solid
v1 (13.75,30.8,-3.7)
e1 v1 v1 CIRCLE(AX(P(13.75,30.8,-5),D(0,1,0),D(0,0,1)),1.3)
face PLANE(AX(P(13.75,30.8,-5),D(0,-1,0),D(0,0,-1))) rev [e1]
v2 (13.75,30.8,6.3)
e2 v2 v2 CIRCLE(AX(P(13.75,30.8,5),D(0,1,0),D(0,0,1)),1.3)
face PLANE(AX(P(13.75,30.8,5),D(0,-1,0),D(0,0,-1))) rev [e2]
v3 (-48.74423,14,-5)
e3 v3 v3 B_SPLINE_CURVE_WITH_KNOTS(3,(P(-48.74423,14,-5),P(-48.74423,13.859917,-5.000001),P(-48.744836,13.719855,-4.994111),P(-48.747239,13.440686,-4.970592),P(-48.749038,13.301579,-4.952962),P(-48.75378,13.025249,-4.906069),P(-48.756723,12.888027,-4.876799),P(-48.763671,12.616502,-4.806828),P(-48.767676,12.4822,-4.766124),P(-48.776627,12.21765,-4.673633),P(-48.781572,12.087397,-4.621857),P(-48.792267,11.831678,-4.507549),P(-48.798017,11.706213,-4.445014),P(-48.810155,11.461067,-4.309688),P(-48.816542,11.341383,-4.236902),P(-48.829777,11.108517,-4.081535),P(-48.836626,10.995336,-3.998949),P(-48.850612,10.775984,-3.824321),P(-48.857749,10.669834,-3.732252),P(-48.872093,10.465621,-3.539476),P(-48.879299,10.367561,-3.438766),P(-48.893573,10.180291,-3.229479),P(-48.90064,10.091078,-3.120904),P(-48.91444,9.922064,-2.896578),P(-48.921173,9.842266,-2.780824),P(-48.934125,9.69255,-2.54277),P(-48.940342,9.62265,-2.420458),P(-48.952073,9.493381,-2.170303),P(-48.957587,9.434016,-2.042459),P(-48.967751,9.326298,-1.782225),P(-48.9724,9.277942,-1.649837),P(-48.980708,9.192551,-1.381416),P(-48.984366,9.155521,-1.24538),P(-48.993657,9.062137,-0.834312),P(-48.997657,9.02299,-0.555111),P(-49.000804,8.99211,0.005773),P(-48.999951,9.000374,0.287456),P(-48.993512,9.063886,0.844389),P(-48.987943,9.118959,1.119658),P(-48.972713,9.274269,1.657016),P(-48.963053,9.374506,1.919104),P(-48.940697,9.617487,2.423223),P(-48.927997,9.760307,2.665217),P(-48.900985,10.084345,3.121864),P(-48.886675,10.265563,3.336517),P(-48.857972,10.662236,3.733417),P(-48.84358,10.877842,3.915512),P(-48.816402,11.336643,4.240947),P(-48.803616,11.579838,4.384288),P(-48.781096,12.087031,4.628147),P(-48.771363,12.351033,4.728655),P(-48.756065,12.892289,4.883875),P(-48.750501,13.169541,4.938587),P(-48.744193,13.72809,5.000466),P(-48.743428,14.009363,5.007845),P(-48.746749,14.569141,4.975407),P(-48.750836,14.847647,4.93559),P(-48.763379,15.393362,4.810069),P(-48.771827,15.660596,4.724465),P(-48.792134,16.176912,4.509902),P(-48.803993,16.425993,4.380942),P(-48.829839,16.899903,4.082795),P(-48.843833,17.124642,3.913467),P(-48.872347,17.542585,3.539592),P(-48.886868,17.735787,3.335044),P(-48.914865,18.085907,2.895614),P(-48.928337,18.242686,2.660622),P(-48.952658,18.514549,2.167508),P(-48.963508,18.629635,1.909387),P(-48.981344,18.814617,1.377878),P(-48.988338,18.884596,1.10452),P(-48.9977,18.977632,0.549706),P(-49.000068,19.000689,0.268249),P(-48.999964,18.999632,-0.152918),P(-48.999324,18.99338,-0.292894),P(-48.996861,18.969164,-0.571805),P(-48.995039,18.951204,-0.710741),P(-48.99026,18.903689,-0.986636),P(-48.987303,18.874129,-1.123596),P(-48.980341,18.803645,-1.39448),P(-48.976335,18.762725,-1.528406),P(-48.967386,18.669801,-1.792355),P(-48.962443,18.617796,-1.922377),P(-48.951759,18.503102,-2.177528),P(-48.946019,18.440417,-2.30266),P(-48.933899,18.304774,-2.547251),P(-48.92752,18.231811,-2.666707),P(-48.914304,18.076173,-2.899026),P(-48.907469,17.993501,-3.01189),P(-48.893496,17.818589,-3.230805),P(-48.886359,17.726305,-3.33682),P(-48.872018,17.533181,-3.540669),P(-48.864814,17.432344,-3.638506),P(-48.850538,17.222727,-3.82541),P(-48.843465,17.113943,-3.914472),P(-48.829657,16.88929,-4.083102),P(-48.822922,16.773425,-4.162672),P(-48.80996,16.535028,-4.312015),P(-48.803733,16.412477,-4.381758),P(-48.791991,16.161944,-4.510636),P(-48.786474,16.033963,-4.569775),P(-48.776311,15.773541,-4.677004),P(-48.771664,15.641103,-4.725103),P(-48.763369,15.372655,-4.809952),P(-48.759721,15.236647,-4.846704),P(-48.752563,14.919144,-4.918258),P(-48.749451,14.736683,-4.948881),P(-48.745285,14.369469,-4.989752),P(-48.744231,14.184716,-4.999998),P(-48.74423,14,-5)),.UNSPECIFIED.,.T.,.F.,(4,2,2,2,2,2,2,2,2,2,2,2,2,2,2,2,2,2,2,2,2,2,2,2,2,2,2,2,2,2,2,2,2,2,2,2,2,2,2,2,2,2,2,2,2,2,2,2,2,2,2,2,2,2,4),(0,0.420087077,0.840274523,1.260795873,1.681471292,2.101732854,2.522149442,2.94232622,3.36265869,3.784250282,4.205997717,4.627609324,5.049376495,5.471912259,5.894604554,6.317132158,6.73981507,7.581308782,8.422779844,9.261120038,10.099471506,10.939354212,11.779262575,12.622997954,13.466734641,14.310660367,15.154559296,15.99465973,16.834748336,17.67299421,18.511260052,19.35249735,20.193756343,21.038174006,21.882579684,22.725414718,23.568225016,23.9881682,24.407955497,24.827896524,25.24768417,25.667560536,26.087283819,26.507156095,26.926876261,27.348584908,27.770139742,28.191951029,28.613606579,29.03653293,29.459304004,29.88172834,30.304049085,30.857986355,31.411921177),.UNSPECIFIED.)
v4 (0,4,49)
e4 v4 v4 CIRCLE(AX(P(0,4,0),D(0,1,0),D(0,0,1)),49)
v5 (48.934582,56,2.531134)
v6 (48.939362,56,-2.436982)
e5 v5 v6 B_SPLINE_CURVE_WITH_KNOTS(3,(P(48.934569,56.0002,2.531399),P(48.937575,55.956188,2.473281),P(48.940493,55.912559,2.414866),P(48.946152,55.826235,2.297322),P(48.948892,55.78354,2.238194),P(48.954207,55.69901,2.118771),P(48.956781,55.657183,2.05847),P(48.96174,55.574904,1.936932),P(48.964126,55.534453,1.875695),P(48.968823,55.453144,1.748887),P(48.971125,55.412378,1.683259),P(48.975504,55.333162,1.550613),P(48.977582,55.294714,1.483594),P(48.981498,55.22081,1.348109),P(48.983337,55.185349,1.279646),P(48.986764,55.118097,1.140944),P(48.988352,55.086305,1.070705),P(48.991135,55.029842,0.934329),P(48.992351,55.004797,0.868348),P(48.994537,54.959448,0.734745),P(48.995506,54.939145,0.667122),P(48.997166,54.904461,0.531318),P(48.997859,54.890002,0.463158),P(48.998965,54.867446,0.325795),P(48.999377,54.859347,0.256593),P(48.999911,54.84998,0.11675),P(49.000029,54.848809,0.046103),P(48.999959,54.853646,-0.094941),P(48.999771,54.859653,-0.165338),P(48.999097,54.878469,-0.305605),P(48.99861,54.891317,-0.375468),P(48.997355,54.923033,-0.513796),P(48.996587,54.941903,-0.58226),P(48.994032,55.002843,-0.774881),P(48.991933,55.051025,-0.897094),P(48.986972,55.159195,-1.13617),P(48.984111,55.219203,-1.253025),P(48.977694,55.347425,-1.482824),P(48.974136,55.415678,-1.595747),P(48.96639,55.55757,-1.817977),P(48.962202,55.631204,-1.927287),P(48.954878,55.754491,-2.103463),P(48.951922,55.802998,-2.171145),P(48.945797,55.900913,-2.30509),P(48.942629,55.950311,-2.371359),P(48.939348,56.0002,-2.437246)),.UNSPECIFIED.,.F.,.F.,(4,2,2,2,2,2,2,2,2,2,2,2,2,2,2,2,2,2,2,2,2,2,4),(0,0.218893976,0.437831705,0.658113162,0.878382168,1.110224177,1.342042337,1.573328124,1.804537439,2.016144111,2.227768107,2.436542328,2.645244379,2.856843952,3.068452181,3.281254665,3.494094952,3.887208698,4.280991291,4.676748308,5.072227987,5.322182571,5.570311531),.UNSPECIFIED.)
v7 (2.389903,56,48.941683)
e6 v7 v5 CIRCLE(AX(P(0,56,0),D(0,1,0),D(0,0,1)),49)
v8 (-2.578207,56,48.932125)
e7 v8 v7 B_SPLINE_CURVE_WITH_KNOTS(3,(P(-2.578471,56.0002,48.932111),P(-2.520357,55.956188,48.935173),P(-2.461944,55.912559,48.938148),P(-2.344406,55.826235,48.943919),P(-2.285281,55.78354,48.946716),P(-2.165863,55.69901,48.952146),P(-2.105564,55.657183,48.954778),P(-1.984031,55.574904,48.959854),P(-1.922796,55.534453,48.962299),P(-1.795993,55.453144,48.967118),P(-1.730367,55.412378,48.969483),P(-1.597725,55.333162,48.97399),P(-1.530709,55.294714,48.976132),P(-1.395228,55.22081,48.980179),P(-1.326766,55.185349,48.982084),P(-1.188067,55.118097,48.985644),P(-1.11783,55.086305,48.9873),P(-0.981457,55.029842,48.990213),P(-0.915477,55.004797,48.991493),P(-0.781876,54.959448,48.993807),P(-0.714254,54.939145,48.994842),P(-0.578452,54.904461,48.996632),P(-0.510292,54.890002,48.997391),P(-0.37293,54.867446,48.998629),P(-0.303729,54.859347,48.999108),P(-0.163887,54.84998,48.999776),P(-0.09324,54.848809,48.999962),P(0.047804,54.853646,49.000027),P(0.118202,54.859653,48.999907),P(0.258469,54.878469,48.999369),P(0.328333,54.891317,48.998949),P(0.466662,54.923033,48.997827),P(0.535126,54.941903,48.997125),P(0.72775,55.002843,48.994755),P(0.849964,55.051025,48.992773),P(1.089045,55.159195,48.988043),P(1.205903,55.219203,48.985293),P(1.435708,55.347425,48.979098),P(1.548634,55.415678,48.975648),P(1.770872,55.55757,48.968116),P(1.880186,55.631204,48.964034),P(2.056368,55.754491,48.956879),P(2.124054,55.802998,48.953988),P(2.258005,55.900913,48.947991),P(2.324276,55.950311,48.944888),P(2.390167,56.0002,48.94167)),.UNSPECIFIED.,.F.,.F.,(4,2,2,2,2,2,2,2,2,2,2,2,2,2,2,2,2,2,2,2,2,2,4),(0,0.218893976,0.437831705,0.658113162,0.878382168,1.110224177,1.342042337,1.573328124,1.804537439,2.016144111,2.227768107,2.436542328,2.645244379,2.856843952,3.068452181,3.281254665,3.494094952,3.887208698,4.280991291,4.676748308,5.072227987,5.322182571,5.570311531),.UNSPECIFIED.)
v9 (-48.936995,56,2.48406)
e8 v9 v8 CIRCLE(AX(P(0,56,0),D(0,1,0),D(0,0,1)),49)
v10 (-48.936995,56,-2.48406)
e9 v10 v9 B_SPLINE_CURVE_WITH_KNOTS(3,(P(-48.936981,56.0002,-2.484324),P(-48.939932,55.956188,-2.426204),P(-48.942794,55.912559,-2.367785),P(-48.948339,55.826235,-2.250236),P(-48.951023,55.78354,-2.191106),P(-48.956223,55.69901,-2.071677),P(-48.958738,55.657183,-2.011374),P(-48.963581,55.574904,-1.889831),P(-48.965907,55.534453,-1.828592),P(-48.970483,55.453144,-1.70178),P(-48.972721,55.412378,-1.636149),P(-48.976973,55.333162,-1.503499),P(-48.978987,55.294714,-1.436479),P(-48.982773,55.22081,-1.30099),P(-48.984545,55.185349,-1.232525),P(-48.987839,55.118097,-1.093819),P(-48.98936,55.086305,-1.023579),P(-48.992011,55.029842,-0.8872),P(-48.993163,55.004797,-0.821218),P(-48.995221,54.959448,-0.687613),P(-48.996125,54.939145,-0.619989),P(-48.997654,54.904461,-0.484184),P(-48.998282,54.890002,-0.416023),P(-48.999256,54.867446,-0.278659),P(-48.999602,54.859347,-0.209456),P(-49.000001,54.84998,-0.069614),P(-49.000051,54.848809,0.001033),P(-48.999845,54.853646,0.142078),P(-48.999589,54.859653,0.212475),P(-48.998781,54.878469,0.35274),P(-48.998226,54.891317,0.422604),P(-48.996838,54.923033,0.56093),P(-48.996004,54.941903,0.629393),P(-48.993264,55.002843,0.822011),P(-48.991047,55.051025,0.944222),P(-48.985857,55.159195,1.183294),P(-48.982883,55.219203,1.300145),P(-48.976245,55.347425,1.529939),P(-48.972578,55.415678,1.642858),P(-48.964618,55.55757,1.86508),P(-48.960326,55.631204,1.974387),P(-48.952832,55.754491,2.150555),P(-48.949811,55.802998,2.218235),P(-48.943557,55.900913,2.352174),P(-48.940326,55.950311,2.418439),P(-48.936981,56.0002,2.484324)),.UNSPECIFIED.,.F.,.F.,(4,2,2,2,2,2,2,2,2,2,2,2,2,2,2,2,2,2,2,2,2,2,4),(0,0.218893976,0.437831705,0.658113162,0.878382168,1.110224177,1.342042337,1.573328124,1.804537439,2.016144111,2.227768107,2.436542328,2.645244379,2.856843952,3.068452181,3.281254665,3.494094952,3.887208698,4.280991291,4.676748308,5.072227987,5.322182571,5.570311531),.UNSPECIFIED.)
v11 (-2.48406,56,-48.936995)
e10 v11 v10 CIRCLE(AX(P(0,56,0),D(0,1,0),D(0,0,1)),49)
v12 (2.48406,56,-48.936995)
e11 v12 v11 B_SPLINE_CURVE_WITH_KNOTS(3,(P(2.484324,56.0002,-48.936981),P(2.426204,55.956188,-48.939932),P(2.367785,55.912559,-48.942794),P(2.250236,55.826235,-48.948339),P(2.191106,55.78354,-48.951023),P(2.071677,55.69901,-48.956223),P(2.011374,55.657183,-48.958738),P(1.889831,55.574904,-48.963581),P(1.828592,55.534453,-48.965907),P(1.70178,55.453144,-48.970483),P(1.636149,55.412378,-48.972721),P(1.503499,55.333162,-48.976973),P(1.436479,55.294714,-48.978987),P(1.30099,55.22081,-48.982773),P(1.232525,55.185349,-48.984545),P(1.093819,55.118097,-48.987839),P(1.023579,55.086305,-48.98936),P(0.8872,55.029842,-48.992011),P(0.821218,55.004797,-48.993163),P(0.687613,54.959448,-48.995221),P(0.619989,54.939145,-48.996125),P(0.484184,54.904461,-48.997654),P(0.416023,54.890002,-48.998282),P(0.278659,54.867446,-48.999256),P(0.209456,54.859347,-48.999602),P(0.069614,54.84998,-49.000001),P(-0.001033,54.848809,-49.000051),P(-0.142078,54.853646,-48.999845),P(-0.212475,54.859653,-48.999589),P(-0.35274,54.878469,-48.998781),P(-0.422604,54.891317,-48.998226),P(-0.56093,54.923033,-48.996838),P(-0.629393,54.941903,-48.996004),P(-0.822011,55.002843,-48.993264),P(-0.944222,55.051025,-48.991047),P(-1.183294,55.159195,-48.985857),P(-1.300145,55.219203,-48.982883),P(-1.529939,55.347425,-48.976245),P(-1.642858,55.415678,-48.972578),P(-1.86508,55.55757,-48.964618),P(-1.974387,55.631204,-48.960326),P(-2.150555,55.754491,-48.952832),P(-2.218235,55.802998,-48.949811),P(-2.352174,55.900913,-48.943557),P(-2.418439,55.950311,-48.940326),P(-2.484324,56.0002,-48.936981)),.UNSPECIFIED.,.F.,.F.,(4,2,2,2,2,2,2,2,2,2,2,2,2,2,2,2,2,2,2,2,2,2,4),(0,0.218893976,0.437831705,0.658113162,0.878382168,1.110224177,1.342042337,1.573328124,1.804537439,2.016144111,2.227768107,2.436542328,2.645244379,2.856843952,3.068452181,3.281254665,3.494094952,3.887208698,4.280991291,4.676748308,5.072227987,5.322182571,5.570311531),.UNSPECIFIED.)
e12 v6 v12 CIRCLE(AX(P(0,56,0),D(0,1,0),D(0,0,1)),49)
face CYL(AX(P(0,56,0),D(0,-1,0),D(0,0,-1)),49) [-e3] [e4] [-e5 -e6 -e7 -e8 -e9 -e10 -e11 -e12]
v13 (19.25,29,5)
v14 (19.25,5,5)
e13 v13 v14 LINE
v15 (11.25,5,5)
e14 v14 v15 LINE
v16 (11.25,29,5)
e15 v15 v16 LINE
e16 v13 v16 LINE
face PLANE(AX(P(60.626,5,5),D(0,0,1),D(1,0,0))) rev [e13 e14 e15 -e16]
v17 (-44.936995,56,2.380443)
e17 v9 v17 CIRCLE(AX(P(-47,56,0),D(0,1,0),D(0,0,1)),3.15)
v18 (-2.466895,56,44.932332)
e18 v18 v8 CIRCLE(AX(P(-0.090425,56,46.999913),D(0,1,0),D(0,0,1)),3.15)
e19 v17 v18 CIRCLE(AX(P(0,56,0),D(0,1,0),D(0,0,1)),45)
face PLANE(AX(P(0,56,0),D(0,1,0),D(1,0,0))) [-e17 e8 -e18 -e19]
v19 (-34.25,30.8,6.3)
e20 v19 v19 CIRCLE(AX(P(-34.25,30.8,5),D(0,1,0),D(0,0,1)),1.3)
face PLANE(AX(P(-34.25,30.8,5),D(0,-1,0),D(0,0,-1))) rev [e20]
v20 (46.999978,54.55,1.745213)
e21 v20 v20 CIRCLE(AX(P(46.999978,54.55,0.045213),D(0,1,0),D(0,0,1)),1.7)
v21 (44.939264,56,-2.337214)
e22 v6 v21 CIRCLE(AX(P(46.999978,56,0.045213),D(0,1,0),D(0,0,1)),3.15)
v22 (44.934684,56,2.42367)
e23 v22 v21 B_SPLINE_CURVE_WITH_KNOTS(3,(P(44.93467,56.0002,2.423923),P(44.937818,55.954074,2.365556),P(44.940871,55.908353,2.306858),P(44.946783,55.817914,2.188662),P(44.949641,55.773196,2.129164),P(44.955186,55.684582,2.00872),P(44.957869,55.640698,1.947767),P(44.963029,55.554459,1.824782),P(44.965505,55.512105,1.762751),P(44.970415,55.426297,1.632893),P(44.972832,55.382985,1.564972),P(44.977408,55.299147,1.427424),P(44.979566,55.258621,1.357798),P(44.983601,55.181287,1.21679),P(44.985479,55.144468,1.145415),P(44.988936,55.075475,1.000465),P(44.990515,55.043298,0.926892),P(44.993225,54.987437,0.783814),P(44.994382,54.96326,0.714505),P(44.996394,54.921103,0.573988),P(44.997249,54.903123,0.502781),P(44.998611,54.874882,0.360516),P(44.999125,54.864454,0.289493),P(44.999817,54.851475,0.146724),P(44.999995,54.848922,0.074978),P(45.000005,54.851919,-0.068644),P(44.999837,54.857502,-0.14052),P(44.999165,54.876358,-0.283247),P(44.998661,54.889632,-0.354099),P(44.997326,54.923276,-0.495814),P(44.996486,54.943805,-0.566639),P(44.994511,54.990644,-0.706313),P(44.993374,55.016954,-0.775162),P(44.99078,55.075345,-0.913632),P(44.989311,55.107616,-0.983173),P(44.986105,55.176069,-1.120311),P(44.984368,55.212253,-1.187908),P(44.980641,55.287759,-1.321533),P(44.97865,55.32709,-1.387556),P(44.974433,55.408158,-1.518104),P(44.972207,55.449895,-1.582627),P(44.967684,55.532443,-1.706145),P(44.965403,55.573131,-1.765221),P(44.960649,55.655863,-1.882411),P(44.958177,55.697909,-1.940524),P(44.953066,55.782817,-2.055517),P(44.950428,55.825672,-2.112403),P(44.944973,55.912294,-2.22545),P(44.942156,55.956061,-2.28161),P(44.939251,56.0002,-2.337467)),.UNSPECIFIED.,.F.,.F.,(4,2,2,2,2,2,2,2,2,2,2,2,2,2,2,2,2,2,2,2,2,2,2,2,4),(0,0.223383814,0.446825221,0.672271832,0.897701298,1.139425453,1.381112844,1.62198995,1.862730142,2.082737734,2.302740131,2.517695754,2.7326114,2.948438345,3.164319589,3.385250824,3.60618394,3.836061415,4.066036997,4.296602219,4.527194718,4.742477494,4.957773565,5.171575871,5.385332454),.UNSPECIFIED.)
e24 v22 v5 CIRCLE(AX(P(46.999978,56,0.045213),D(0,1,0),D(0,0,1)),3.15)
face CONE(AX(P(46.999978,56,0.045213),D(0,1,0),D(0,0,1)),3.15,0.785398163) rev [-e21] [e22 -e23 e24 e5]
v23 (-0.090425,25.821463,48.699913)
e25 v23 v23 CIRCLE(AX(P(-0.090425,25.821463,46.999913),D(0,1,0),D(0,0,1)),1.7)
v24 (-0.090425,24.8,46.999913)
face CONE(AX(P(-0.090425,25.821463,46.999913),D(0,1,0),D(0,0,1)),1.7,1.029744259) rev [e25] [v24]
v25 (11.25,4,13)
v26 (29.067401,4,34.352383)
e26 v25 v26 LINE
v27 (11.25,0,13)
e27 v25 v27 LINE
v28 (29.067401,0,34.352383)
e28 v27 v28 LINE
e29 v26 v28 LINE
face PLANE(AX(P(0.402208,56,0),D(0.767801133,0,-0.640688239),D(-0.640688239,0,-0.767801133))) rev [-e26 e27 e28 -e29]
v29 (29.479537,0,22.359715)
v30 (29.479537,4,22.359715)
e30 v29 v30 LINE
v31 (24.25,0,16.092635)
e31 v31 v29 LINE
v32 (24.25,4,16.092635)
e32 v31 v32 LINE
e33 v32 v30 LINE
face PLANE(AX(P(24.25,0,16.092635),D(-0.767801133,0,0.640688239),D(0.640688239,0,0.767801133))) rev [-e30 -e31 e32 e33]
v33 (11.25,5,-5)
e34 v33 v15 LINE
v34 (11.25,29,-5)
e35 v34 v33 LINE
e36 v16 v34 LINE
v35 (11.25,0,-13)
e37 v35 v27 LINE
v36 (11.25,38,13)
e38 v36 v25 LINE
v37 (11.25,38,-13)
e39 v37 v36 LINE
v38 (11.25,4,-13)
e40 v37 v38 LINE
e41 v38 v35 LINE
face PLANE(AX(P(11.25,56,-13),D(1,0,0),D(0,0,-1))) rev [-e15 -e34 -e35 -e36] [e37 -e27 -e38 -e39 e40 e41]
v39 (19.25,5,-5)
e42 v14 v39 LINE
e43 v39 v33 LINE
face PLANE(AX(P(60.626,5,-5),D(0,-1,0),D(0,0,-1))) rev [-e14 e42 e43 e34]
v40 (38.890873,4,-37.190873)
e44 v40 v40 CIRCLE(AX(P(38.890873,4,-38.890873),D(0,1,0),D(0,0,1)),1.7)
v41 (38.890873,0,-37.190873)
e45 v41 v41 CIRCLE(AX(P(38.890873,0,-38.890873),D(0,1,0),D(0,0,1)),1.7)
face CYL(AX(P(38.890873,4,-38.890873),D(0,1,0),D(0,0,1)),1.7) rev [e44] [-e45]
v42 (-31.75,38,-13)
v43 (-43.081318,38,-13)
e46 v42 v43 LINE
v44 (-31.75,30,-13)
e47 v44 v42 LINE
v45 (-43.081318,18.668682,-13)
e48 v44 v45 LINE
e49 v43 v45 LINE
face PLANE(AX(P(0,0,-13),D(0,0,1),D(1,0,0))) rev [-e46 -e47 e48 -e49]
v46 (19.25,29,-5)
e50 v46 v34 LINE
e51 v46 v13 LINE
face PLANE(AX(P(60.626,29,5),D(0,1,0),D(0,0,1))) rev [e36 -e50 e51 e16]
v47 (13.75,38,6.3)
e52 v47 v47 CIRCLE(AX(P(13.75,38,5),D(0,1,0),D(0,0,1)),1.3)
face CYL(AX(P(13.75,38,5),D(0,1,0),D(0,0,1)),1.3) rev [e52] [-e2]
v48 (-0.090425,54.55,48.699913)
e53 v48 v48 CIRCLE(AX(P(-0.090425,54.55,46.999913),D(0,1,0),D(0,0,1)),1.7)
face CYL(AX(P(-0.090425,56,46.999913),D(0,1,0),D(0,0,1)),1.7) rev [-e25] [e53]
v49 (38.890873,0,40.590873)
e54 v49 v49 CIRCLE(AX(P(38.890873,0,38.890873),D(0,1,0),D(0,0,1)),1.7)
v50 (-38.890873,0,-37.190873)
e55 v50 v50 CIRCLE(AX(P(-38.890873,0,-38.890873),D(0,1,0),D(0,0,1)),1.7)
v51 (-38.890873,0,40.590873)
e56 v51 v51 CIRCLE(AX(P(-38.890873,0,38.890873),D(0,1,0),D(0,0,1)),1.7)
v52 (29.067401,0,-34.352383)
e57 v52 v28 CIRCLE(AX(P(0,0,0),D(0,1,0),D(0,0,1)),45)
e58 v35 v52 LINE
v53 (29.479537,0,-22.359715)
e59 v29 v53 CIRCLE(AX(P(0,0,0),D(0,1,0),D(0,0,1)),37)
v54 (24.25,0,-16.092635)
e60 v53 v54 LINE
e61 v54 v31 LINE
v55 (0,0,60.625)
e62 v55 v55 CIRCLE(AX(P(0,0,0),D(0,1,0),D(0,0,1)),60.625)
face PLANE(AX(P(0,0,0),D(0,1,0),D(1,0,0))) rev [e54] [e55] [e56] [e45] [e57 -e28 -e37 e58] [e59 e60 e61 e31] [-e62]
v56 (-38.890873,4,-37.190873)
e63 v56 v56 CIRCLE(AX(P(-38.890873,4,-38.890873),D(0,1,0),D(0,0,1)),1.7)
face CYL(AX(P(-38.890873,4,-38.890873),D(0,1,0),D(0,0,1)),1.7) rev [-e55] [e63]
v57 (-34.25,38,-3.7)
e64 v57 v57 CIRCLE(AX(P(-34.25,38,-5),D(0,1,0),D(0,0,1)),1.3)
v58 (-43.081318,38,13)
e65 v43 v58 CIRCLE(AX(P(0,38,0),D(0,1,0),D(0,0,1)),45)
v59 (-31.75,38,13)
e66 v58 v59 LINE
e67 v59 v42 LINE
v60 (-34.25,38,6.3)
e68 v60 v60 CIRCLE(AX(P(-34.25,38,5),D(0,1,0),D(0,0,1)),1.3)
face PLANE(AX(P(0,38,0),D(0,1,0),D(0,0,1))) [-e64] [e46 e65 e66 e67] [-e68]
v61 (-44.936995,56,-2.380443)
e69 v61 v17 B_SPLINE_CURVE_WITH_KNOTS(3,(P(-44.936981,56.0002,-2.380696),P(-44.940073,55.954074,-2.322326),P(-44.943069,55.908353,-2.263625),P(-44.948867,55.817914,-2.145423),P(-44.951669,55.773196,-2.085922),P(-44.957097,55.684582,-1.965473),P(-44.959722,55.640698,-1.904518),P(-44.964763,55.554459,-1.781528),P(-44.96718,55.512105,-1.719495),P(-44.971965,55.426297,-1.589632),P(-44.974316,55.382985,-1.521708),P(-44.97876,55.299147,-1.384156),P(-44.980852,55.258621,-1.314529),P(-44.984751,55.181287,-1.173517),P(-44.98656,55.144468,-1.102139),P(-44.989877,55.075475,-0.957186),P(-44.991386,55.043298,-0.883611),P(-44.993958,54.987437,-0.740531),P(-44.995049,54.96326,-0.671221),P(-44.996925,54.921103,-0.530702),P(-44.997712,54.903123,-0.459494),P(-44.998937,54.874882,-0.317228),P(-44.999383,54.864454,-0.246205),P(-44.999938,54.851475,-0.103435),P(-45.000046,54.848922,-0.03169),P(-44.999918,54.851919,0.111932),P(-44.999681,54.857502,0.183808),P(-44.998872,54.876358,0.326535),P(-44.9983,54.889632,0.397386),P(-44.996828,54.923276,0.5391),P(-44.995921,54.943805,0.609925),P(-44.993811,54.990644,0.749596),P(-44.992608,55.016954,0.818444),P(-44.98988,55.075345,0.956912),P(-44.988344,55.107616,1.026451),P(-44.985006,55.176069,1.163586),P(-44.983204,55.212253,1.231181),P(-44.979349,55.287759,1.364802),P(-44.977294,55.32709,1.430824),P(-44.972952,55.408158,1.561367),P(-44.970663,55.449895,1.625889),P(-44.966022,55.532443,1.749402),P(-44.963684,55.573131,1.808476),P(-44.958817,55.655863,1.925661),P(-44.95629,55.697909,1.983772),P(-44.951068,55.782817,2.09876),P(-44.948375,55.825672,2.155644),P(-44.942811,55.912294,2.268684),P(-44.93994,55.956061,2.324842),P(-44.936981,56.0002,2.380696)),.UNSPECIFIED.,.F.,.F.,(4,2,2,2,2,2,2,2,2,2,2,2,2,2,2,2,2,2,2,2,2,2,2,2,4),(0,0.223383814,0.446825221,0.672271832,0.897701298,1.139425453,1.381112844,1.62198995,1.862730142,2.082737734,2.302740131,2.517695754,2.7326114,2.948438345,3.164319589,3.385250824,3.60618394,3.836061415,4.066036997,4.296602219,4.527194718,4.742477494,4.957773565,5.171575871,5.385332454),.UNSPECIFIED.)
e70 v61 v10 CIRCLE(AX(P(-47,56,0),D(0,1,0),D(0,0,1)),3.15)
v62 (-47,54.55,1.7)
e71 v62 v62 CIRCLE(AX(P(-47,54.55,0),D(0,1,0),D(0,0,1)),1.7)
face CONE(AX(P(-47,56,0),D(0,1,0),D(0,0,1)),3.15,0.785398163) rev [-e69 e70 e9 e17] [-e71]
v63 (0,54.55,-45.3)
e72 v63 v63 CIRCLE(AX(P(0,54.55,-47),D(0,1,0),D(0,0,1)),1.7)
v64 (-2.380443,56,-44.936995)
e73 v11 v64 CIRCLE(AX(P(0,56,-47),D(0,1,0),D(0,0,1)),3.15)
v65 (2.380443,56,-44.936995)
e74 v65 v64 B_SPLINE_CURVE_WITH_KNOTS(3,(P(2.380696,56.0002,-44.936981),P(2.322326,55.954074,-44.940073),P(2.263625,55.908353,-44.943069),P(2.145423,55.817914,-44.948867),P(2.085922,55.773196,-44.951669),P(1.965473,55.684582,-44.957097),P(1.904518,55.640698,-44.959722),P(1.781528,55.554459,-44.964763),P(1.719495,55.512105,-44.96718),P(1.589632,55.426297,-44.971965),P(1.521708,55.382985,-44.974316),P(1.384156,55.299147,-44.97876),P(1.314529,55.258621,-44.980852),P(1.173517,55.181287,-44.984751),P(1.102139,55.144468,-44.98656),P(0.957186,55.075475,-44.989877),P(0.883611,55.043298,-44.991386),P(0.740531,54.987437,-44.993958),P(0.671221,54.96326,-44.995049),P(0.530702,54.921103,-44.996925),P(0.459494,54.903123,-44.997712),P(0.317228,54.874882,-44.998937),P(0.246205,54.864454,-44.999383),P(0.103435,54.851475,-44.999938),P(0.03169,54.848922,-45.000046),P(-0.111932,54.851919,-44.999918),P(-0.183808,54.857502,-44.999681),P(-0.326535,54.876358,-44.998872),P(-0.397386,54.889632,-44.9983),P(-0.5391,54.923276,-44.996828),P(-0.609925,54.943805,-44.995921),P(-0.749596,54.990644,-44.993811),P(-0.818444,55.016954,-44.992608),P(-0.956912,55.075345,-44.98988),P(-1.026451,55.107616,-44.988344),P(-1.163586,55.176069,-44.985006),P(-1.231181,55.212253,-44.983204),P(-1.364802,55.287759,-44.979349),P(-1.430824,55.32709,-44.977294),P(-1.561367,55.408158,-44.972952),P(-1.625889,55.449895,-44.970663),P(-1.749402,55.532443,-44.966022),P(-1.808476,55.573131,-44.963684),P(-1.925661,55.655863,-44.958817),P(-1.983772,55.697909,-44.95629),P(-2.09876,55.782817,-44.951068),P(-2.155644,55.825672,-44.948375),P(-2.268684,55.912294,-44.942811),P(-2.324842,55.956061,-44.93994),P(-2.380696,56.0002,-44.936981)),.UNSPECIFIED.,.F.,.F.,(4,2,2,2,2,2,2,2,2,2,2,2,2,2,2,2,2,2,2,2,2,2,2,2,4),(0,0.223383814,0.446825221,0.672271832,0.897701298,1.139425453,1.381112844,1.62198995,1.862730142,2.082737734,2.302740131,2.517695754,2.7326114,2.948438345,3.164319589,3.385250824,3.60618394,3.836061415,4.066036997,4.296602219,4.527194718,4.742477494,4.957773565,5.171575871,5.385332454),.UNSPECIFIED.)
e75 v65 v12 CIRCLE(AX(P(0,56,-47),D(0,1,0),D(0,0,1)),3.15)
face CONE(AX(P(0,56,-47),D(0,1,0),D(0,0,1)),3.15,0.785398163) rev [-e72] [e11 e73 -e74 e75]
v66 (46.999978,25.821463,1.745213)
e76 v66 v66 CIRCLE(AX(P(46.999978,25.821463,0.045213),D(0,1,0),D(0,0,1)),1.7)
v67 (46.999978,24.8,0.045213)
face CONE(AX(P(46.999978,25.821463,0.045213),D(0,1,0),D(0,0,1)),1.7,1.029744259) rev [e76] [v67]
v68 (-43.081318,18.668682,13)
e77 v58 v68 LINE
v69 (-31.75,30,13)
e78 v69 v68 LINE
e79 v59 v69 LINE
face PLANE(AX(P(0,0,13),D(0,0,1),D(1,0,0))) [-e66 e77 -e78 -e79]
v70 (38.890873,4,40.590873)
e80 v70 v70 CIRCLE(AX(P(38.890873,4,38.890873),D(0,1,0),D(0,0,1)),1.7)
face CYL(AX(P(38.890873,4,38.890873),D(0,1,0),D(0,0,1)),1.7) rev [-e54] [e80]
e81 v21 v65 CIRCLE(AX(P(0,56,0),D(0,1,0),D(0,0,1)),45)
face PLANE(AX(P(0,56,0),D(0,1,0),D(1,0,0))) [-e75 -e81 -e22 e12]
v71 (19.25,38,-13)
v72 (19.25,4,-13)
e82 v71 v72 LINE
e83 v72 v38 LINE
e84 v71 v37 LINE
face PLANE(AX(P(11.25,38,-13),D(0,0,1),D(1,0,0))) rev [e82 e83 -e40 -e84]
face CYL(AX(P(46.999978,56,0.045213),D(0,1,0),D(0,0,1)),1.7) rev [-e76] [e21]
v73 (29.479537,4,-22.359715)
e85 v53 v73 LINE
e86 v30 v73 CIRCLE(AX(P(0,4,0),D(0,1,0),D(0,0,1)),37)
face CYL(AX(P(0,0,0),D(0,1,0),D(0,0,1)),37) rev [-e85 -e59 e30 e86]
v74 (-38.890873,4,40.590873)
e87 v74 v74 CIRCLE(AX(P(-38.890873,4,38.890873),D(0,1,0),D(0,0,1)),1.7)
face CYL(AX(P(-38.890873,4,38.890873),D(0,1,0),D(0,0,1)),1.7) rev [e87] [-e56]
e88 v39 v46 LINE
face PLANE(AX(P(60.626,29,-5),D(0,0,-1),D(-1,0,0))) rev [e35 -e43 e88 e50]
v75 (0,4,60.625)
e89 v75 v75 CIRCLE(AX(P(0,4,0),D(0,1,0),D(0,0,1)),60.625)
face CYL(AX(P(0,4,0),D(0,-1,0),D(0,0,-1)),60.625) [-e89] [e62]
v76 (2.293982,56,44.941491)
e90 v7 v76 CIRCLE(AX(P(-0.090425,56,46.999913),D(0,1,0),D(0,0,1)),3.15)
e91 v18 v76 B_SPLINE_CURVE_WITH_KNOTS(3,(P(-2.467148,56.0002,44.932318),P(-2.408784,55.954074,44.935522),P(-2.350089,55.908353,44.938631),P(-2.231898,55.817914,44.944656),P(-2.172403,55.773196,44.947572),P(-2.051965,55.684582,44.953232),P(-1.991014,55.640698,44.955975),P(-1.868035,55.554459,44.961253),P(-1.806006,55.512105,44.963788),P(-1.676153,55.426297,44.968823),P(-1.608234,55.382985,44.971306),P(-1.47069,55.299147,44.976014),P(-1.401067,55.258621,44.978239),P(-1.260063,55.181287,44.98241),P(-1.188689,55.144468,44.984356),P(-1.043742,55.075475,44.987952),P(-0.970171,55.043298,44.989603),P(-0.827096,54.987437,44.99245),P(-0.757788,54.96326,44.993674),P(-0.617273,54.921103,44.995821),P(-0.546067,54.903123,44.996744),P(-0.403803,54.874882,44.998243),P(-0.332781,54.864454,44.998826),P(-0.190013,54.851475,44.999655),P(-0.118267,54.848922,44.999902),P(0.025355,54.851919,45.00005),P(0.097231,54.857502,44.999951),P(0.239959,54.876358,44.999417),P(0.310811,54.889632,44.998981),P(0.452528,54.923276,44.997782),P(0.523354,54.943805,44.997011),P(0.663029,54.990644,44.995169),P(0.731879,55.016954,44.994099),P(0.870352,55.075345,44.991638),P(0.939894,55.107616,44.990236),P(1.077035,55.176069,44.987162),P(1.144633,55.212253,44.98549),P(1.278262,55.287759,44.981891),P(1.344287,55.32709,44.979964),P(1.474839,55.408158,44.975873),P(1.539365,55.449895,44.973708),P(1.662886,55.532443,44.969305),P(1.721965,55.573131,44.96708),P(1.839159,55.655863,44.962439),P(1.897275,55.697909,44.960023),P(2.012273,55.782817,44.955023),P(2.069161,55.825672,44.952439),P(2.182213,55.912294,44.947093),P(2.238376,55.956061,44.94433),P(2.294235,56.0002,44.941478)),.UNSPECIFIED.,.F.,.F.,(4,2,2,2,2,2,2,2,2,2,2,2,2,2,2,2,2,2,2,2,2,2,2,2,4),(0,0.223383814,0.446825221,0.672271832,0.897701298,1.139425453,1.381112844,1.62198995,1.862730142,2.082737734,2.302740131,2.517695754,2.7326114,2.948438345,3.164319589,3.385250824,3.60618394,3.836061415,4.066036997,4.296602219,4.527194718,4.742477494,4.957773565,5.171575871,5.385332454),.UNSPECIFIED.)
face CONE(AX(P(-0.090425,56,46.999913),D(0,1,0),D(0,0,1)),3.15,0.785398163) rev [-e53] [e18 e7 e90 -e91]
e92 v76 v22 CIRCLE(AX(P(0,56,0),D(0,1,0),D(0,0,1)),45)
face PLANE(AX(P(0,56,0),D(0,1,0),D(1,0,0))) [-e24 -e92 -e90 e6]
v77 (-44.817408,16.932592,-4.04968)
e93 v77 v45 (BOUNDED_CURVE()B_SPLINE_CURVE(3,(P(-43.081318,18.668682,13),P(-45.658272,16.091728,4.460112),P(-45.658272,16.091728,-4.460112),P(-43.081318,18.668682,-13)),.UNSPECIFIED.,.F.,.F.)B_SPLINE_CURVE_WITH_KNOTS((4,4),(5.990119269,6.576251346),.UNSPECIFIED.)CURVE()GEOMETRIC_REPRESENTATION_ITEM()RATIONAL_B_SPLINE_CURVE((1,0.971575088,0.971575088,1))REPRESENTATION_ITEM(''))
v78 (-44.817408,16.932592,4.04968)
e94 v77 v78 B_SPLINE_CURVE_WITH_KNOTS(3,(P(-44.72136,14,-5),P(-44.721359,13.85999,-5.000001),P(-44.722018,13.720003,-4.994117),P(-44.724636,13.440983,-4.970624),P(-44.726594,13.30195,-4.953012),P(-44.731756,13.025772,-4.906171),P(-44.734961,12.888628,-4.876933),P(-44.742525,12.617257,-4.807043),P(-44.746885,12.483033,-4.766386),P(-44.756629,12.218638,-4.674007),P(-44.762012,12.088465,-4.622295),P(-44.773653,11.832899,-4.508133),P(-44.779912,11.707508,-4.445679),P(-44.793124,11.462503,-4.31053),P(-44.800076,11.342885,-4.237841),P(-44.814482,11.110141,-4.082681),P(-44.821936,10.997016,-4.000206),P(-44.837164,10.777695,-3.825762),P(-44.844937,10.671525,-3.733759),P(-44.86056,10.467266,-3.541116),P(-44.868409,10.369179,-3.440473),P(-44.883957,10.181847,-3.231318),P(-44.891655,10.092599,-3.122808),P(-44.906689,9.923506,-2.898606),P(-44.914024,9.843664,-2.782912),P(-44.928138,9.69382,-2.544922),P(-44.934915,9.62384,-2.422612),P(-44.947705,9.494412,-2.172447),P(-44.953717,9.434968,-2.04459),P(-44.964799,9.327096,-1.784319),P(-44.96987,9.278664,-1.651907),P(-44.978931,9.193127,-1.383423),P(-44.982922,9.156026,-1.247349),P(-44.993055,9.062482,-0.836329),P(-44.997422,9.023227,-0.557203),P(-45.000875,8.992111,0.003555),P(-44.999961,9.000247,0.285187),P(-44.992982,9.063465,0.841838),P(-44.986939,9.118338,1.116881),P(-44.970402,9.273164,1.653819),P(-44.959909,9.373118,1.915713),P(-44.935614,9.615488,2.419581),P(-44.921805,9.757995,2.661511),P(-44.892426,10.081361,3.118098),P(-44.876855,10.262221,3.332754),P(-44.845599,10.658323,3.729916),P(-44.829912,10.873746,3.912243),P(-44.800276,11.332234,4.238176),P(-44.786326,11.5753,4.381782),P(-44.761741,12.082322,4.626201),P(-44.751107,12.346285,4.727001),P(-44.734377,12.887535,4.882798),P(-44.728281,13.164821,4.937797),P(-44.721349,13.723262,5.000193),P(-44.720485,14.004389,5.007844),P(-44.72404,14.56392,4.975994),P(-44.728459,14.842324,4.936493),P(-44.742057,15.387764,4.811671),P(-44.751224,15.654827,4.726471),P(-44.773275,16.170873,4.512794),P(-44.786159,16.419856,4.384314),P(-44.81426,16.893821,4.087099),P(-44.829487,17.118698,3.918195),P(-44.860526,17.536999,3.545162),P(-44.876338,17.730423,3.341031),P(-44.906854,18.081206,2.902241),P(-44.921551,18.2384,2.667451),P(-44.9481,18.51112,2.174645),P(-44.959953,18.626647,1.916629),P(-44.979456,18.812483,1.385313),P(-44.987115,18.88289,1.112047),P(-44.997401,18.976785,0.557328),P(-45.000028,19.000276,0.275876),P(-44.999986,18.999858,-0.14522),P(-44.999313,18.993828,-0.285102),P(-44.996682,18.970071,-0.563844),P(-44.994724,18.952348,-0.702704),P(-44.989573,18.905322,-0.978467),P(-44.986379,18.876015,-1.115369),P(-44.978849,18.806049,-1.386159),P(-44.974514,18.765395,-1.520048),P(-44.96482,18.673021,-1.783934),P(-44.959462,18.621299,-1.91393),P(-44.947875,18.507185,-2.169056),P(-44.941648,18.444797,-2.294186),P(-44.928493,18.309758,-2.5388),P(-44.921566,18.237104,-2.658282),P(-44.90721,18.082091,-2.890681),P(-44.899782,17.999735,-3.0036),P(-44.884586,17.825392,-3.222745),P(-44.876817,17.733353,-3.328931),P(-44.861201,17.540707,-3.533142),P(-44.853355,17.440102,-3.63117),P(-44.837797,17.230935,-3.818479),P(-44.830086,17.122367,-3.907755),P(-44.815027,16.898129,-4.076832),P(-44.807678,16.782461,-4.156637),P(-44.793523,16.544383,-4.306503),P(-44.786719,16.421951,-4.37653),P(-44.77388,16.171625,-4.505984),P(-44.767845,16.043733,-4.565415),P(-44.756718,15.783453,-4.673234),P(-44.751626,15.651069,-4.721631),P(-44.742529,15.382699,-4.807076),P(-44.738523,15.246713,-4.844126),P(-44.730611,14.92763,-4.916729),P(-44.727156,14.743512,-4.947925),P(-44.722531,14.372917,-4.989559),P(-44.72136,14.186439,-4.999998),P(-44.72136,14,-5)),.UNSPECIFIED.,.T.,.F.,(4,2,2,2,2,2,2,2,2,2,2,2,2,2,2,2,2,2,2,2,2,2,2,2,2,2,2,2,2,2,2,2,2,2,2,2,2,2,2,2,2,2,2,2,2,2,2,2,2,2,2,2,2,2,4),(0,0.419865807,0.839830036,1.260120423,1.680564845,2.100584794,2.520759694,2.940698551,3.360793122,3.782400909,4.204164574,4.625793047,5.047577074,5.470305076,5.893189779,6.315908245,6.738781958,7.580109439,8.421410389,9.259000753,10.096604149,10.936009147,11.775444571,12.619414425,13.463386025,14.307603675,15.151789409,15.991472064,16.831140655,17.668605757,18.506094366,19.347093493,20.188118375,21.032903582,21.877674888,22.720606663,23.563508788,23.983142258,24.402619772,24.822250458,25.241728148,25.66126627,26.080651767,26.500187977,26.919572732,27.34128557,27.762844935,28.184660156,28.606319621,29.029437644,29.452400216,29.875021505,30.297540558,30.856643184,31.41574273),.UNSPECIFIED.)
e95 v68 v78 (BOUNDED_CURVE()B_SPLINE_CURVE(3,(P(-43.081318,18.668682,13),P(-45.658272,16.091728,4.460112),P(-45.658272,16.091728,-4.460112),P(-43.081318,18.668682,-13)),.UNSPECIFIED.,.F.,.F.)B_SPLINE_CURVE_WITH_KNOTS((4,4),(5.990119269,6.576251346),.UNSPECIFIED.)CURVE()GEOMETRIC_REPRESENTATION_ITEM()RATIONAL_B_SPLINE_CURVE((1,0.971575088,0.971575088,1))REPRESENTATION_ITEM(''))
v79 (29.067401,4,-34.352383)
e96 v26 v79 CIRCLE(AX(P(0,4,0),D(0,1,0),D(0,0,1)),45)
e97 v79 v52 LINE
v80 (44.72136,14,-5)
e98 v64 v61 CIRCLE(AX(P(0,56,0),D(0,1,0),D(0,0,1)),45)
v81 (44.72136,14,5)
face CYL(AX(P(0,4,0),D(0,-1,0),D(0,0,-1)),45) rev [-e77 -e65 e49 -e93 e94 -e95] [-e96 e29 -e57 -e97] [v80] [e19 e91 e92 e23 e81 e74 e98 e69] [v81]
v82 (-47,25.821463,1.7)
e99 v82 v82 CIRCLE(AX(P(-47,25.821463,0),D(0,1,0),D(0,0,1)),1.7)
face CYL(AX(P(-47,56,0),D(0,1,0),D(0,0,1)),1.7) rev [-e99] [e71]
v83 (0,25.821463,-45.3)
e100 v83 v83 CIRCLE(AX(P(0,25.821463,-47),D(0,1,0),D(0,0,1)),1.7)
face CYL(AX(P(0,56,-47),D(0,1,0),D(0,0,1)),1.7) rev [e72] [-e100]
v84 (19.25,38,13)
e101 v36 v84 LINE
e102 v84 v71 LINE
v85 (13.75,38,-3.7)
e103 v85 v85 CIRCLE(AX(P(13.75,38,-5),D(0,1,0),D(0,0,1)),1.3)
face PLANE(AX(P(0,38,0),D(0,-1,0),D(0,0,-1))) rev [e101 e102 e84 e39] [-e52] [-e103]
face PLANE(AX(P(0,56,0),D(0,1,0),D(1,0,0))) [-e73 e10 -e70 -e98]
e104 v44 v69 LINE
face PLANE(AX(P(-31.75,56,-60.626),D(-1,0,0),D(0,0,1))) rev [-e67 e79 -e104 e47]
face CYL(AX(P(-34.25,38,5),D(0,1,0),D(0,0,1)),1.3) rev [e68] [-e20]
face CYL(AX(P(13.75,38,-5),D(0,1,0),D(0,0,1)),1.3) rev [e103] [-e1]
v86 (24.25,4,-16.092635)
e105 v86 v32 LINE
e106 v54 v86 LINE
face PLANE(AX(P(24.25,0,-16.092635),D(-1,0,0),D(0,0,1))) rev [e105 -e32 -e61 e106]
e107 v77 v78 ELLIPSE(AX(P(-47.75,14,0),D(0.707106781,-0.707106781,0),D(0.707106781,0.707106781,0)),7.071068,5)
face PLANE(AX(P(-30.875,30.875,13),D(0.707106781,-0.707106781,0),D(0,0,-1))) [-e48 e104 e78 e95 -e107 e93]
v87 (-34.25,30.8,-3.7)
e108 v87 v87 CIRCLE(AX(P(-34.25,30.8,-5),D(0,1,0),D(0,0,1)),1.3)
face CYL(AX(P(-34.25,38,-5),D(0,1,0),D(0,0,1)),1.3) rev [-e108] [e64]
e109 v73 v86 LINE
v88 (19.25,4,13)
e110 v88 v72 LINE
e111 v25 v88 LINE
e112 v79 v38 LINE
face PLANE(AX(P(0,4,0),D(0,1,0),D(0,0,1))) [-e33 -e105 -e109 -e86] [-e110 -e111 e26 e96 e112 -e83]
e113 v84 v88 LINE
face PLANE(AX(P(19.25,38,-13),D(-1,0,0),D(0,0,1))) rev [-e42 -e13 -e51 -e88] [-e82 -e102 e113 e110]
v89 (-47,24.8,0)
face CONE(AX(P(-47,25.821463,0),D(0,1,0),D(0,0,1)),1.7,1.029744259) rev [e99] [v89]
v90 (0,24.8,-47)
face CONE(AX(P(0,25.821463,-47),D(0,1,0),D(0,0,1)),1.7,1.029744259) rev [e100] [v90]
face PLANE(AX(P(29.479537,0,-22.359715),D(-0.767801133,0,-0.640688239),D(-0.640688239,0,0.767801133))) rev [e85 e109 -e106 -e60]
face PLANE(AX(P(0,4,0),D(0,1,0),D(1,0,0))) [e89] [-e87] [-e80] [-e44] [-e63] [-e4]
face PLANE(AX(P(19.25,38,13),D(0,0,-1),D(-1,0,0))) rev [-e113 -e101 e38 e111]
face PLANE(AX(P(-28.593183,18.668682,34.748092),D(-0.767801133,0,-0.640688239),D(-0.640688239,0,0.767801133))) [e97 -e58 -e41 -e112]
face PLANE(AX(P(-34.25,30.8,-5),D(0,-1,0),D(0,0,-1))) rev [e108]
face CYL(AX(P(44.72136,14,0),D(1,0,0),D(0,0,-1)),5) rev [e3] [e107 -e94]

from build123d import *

# Parameters (mm, degrees)
BOSS_EXTRUDE1_START                             = -18.668682
BOSS_EXTRUDE1_OUTLINE_R                         = 49
BOSS_EXTRUDE1_DEPTH                             = 18.668682
BOSS_EXTRUDE1_START_2                           = -56
BOSS_EXTRUDE1_2_OUTLINE_R                       = 49
BOSS_EXTRUDE1_2_OUTLINE_R_2                     = 45
BOSS_EXTRUDE1_2_DEPTH                           = 37.331318
BOSS_EXTRUDE1_START_3                           = -4
BOSS_EXTRUDE1_3_OUTLINE_R                       = 60.625
BOSS_EXTRUDE1_3_OUTLINE_R_2                     = 49
BOSS_EXTRUDE1_3_DEPTH                           = 4
BOSS_EXTRUDE1_START_4                           = -13
BOSS_EXTRUDE1_4_DEPTH                           = 26
CUT_EXTRUDE1_DEPTH                              = 1.918682
CUT_EXTRUDE2_REACH                              = 112.599
CUT_EXTRUDE3_DEPTH                              = 103.404986
CUT_EXTRUDE4_DEPTH                              = 103.404986
CUT_EXTRUDE5_DEPTH                              = 12.75
CUT_EXTRUDE6_DEPTH                              = 18
SKETCH16_W                                      = 8
SKETCH16_H                                      = 26
BOSS_EXTRUDE2_DEPTH                             = 34
CUT_EXTRUDE7_DEPTH                              = 101.273532
CUT_EXTRUDE8_REACH                              = 111.441
SKETCH23_W                                      = 10
SKETCH23_H                                      = 24
F_3_4_3_4_DIAMETER_HOLE1_D                      = 3.4
SKETCH26_W                                      = 5
SKETCH26_H                                      = 105.34636
F_2_6_2_6_DIAMETER_HOLE1_D                      = 2.6
F_2_6_2_6_DIAMETER_HOLE1_DEPTH                  = 7.2
CSK_FOR_M3_FLAT_HEAD_MACHINE_SCREW1_D           = 3.4
CSK_FOR_M3_FLAT_HEAD_MACHINE_SCREW1_DEPTH       = 30.178537
CSK_FOR_M3_FLAT_HEAD_MACHINE_SCREW1_CSINK_D     = 6.3
CSK_FOR_M3_FLAT_HEAD_MACHINE_SCREW1_CSINK_ANGLE = 90
CSK_FOR_M3_FLAT_HEAD_MACHINE_SCREW1_TIP         = 1.021463


with BuildPart() as part:
    # Boss-Extrude1: read off the stored shape, not the designer's step
    # Boss-Extrude1 outline → Boss-Extrude1 (new body)
    with BuildSketch(Plane.XZ.offset(BOSS_EXTRUDE1_START)):
        Circle(BOSS_EXTRUDE1_OUTLINE_R)
        with BuildLine():
            Line((-10.445584, 13), (29.067401, -34.352383))
            ThreePointArc((29.067401, -34.352383), (-34.551051, -28.830971), (-28.593183, 34.748092))
            Line((-28.593183, 34.748092), (-10.445584, 13))
        make_face(mode=Mode.SUBTRACT)
    extrude(amount=BOSS_EXTRUDE1_DEPTH)

    # Boss-Extrude1 2 outline → Boss-Extrude1 2 (add)
    with BuildSketch(Plane.XZ.offset(BOSS_EXTRUDE1_START_2)):
        Circle(BOSS_EXTRUDE1_2_OUTLINE_R)
        Circle(BOSS_EXTRUDE1_2_OUTLINE_R_2, mode=Mode.SUBTRACT)
    extrude(amount=BOSS_EXTRUDE1_2_DEPTH)

    # Boss-Extrude1 3 outline → Boss-Extrude1 3 (add)
    with BuildSketch(Plane.XZ.offset(BOSS_EXTRUDE1_START_3)):
        Circle(BOSS_EXTRUDE1_3_OUTLINE_R)
        Circle(BOSS_EXTRUDE1_3_OUTLINE_R_2, mode=Mode.SUBTRACT)
    extrude(amount=BOSS_EXTRUDE1_3_DEPTH)

    # Boss-Extrude1 4 outline → Boss-Extrude1 4 (add)
    with BuildSketch(Plane.XY.offset(BOSS_EXTRUDE1_START_4)):
        Polygon((-46.75, 15), (-5.75, 56), (-47, 56), (-47, 15), align=None)
    extrude(amount=BOSS_EXTRUDE1_4_DEPTH)

    # Sketch2 → Cut-Extrude1 (cut)
    with BuildSketch(Plane(origin=(0, 18.668682, 0), x_dir=(-1, 0, 0), z_dir=(0, 1, 0))):
        with BuildLine():
            Line((-29.067401, -34.352383), (28.593183, 34.748092))
            ThreePointArc((28.593183, 34.748092), (-34.551051, 28.830971), (-29.067401, -34.352383))
        make_face()
    extrude(amount=-CUT_EXTRUDE1_DEPTH, mode=Mode.SUBTRACT)

    # Sketch7 → Cut-Extrude2 (cut, up to next)
    with BuildSketch(Plane.XY.offset(13), mode=Mode.PRIVATE) as cut_extrude2_sk1:
        Polygon((-31.75, 56), (-31.75, 30), (-5.75, 56), align=None)
    cut_extrude2_tool1 = extrude(cut_extrude2_sk1.sketch, amount=-CUT_EXTRUDE2_REACH, mode=Mode.PRIVATE) & part.part
    add(cut_extrude2_tool1.solids().sort_by_distance((-23.083333, 47.333333, 13))[0], mode=Mode.SUBTRACT)

    # Sketch12 → Cut-Extrude3 (cut, through all)
    with BuildSketch(Plane.XZ):
        with BuildLine():
            Line((-28.593183, 34.748092), (0.402208, 0))
            Line((0.402208, 0), (29.067401, 34.352383))
            ThreePointArc((29.067401, 34.352383), (0.308816, 44.99894), (-28.593183, 34.748092))
        make_face()
    extrude(amount=-CUT_EXTRUDE3_DEPTH, mode=Mode.SUBTRACT)

    # Sketch13 → Cut-Extrude4 (cut, through all)
    with BuildSketch(Plane.XZ):
        Polygon((0.402208, 0), (11.25, -13), (11.25, 13), align=None)
    extrude(amount=-CUT_EXTRUDE4_DEPTH, mode=Mode.SUBTRACT)

    # Sketch14 → Cut-Extrude5 (cut)
    with BuildSketch(Plane(origin=(0, 16.75, 0), x_dir=(-1, 0, 0), z_dir=(0, 1, 0))):
        with BuildLine():
            Line((-11.25, -13), (-11.25, 13))
            Line((-11.25, 13), (-29.067401, 34.352383))
            ThreePointArc((-29.067401, 34.352383), (-45, 0), (-29.067401, -34.352383))
            Line((-29.067401, -34.352383), (-11.25, -13))
        make_face()
    extrude(amount=-CUT_EXTRUDE5_DEPTH, mode=Mode.SUBTRACT)

    # Sketch15 → Cut-Extrude6 (cut)
    with BuildSketch(Plane(origin=(0, 56, 0), x_dir=(-1, 0, 0), z_dir=(0, 1, 0))):
        with BuildLine():
            Line((43.081318, 13), (31.75, 13))
            Line((31.75, 13), (31.75, -13))
            Line((31.75, -13), (43.081318, -13))
            ThreePointArc((43.081318, -13), (45, 0), (43.081318, 13))
        make_face()
    extrude(amount=-CUT_EXTRUDE6_DEPTH, mode=Mode.SUBTRACT)

    # Sketch16 → Boss-Extrude2 (add)
    with BuildSketch(Plane(origin=(0, 4, 0), x_dir=(-1, 0, 0), z_dir=(0, 1, 0))):
        with Locations((-15.25, 0)):
            Rectangle(SKETCH16_W, SKETCH16_H)
    extrude(amount=BOSS_EXTRUDE2_DEPTH)

    # Sketch17 → Cut-Extrude7 (cut, through all)
    with BuildSketch(Plane(origin=(0, 4, 0), x_dir=(-1, 0, 0), z_dir=(0, 1, 0))):
        with BuildLine():
            Line((-29.479537, -22.359715), (-24.25, -16.092635))
            Line((-24.25, -16.092635), (-24.25, 16.092635))
            Line((-24.25, 16.092635), (-29.479537, 22.359715))
            ThreePointArc((-29.479537, 22.359715), (-37, 0), (-29.479537, -22.359715))
        make_face()
    extrude(amount=-CUT_EXTRUDE7_DEPTH, mode=Mode.SUBTRACT)

    # Sketch23 → Cut-Extrude8 (cut, up to next)
    with BuildSketch(Plane.ZY.offset(-11.25), mode=Mode.PRIVATE) as cut_extrude8_sk1:
        with Locations((0, 17)):
            Rectangle(SKETCH23_W, SKETCH23_H)
    cut_extrude8_tool1 = extrude(cut_extrude8_sk1.sketch, amount=-CUT_EXTRUDE8_REACH, mode=Mode.PRIVATE) & part.part
    add(cut_extrude8_tool1.solids().sort_by_distance((11.25, 17, 0))[0], mode=Mode.SUBTRACT)

    # Ø3.4 (3.4) Diameter Hole1 (through all)
    with Locations(Plane(origin=(0, 4, 0), x_dir=(1, 0, 0), z_dir=(0, 1, 0))):
        with Locations((38.890873, 38.890873), (38.890873, -38.890873), (-38.890873, -38.890873), (-38.890873, 38.890873)):
            Hole(F_3_4_3_4_DIAMETER_HOLE1_D / 2)

    # Sketch26 → Ø10.0 (10) Diameter Hole1 (revolve, cut)
    with BuildSketch(Plane(origin=(44.72136, 14, 0), x_dir=(0, 0, -1), z_dir=(0, 1, 0))):
        with Locations((2.5, 52.67318)):
            Rectangle(SKETCH26_W, SKETCH26_H)
    revolve(axis=Axis((51.07136, 14, 0), (-1, 0, 0)), mode=Mode.SUBTRACT)

    # Ø2.6 (2.6) Diameter Hole1
    with Locations(Plane(origin=(0, 38, 0), x_dir=(1, 0, 0), z_dir=(0, 1, 0))):
        with Locations((13.75, -5), (13.75, 5), (-34.25, 5), (-34.25, -5)):
            Hole(F_2_6_2_6_DIAMETER_HOLE1_D / 2, depth=F_2_6_2_6_DIAMETER_HOLE1_DEPTH)

    # CSK for M3 Flat Head Machine Screw1
    with Locations(Plane(origin=(0, 56, 0), x_dir=(1, 0, 0), z_dir=(0, 1, 0))):
        with Locations((0, 47), (-47, 0), (-0.090425, -46.999913), (46.999978, -0.045213)):
            CounterSinkHole(CSK_FOR_M3_FLAT_HEAD_MACHINE_SCREW1_D / 2, CSK_FOR_M3_FLAT_HEAD_MACHINE_SCREW1_CSINK_D / 2, depth=CSK_FOR_M3_FLAT_HEAD_MACHINE_SCREW1_DEPTH, counter_sink_angle=CSK_FOR_M3_FLAT_HEAD_MACHINE_SCREW1_CSINK_ANGLE)
            with Locations((0, 0, -(CSK_FOR_M3_FLAT_HEAD_MACHINE_SCREW1_DEPTH + CSK_FOR_M3_FLAT_HEAD_MACHINE_SCREW1_TIP / 2))):  # 118° drill point
                Cone(0, CSK_FOR_M3_FLAT_HEAD_MACHINE_SCREW1_D / 2, CSK_FOR_M3_FLAT_HEAD_MACHINE_SCREW1_TIP, mode=Mode.SUBTRACT)


solid = part.part
